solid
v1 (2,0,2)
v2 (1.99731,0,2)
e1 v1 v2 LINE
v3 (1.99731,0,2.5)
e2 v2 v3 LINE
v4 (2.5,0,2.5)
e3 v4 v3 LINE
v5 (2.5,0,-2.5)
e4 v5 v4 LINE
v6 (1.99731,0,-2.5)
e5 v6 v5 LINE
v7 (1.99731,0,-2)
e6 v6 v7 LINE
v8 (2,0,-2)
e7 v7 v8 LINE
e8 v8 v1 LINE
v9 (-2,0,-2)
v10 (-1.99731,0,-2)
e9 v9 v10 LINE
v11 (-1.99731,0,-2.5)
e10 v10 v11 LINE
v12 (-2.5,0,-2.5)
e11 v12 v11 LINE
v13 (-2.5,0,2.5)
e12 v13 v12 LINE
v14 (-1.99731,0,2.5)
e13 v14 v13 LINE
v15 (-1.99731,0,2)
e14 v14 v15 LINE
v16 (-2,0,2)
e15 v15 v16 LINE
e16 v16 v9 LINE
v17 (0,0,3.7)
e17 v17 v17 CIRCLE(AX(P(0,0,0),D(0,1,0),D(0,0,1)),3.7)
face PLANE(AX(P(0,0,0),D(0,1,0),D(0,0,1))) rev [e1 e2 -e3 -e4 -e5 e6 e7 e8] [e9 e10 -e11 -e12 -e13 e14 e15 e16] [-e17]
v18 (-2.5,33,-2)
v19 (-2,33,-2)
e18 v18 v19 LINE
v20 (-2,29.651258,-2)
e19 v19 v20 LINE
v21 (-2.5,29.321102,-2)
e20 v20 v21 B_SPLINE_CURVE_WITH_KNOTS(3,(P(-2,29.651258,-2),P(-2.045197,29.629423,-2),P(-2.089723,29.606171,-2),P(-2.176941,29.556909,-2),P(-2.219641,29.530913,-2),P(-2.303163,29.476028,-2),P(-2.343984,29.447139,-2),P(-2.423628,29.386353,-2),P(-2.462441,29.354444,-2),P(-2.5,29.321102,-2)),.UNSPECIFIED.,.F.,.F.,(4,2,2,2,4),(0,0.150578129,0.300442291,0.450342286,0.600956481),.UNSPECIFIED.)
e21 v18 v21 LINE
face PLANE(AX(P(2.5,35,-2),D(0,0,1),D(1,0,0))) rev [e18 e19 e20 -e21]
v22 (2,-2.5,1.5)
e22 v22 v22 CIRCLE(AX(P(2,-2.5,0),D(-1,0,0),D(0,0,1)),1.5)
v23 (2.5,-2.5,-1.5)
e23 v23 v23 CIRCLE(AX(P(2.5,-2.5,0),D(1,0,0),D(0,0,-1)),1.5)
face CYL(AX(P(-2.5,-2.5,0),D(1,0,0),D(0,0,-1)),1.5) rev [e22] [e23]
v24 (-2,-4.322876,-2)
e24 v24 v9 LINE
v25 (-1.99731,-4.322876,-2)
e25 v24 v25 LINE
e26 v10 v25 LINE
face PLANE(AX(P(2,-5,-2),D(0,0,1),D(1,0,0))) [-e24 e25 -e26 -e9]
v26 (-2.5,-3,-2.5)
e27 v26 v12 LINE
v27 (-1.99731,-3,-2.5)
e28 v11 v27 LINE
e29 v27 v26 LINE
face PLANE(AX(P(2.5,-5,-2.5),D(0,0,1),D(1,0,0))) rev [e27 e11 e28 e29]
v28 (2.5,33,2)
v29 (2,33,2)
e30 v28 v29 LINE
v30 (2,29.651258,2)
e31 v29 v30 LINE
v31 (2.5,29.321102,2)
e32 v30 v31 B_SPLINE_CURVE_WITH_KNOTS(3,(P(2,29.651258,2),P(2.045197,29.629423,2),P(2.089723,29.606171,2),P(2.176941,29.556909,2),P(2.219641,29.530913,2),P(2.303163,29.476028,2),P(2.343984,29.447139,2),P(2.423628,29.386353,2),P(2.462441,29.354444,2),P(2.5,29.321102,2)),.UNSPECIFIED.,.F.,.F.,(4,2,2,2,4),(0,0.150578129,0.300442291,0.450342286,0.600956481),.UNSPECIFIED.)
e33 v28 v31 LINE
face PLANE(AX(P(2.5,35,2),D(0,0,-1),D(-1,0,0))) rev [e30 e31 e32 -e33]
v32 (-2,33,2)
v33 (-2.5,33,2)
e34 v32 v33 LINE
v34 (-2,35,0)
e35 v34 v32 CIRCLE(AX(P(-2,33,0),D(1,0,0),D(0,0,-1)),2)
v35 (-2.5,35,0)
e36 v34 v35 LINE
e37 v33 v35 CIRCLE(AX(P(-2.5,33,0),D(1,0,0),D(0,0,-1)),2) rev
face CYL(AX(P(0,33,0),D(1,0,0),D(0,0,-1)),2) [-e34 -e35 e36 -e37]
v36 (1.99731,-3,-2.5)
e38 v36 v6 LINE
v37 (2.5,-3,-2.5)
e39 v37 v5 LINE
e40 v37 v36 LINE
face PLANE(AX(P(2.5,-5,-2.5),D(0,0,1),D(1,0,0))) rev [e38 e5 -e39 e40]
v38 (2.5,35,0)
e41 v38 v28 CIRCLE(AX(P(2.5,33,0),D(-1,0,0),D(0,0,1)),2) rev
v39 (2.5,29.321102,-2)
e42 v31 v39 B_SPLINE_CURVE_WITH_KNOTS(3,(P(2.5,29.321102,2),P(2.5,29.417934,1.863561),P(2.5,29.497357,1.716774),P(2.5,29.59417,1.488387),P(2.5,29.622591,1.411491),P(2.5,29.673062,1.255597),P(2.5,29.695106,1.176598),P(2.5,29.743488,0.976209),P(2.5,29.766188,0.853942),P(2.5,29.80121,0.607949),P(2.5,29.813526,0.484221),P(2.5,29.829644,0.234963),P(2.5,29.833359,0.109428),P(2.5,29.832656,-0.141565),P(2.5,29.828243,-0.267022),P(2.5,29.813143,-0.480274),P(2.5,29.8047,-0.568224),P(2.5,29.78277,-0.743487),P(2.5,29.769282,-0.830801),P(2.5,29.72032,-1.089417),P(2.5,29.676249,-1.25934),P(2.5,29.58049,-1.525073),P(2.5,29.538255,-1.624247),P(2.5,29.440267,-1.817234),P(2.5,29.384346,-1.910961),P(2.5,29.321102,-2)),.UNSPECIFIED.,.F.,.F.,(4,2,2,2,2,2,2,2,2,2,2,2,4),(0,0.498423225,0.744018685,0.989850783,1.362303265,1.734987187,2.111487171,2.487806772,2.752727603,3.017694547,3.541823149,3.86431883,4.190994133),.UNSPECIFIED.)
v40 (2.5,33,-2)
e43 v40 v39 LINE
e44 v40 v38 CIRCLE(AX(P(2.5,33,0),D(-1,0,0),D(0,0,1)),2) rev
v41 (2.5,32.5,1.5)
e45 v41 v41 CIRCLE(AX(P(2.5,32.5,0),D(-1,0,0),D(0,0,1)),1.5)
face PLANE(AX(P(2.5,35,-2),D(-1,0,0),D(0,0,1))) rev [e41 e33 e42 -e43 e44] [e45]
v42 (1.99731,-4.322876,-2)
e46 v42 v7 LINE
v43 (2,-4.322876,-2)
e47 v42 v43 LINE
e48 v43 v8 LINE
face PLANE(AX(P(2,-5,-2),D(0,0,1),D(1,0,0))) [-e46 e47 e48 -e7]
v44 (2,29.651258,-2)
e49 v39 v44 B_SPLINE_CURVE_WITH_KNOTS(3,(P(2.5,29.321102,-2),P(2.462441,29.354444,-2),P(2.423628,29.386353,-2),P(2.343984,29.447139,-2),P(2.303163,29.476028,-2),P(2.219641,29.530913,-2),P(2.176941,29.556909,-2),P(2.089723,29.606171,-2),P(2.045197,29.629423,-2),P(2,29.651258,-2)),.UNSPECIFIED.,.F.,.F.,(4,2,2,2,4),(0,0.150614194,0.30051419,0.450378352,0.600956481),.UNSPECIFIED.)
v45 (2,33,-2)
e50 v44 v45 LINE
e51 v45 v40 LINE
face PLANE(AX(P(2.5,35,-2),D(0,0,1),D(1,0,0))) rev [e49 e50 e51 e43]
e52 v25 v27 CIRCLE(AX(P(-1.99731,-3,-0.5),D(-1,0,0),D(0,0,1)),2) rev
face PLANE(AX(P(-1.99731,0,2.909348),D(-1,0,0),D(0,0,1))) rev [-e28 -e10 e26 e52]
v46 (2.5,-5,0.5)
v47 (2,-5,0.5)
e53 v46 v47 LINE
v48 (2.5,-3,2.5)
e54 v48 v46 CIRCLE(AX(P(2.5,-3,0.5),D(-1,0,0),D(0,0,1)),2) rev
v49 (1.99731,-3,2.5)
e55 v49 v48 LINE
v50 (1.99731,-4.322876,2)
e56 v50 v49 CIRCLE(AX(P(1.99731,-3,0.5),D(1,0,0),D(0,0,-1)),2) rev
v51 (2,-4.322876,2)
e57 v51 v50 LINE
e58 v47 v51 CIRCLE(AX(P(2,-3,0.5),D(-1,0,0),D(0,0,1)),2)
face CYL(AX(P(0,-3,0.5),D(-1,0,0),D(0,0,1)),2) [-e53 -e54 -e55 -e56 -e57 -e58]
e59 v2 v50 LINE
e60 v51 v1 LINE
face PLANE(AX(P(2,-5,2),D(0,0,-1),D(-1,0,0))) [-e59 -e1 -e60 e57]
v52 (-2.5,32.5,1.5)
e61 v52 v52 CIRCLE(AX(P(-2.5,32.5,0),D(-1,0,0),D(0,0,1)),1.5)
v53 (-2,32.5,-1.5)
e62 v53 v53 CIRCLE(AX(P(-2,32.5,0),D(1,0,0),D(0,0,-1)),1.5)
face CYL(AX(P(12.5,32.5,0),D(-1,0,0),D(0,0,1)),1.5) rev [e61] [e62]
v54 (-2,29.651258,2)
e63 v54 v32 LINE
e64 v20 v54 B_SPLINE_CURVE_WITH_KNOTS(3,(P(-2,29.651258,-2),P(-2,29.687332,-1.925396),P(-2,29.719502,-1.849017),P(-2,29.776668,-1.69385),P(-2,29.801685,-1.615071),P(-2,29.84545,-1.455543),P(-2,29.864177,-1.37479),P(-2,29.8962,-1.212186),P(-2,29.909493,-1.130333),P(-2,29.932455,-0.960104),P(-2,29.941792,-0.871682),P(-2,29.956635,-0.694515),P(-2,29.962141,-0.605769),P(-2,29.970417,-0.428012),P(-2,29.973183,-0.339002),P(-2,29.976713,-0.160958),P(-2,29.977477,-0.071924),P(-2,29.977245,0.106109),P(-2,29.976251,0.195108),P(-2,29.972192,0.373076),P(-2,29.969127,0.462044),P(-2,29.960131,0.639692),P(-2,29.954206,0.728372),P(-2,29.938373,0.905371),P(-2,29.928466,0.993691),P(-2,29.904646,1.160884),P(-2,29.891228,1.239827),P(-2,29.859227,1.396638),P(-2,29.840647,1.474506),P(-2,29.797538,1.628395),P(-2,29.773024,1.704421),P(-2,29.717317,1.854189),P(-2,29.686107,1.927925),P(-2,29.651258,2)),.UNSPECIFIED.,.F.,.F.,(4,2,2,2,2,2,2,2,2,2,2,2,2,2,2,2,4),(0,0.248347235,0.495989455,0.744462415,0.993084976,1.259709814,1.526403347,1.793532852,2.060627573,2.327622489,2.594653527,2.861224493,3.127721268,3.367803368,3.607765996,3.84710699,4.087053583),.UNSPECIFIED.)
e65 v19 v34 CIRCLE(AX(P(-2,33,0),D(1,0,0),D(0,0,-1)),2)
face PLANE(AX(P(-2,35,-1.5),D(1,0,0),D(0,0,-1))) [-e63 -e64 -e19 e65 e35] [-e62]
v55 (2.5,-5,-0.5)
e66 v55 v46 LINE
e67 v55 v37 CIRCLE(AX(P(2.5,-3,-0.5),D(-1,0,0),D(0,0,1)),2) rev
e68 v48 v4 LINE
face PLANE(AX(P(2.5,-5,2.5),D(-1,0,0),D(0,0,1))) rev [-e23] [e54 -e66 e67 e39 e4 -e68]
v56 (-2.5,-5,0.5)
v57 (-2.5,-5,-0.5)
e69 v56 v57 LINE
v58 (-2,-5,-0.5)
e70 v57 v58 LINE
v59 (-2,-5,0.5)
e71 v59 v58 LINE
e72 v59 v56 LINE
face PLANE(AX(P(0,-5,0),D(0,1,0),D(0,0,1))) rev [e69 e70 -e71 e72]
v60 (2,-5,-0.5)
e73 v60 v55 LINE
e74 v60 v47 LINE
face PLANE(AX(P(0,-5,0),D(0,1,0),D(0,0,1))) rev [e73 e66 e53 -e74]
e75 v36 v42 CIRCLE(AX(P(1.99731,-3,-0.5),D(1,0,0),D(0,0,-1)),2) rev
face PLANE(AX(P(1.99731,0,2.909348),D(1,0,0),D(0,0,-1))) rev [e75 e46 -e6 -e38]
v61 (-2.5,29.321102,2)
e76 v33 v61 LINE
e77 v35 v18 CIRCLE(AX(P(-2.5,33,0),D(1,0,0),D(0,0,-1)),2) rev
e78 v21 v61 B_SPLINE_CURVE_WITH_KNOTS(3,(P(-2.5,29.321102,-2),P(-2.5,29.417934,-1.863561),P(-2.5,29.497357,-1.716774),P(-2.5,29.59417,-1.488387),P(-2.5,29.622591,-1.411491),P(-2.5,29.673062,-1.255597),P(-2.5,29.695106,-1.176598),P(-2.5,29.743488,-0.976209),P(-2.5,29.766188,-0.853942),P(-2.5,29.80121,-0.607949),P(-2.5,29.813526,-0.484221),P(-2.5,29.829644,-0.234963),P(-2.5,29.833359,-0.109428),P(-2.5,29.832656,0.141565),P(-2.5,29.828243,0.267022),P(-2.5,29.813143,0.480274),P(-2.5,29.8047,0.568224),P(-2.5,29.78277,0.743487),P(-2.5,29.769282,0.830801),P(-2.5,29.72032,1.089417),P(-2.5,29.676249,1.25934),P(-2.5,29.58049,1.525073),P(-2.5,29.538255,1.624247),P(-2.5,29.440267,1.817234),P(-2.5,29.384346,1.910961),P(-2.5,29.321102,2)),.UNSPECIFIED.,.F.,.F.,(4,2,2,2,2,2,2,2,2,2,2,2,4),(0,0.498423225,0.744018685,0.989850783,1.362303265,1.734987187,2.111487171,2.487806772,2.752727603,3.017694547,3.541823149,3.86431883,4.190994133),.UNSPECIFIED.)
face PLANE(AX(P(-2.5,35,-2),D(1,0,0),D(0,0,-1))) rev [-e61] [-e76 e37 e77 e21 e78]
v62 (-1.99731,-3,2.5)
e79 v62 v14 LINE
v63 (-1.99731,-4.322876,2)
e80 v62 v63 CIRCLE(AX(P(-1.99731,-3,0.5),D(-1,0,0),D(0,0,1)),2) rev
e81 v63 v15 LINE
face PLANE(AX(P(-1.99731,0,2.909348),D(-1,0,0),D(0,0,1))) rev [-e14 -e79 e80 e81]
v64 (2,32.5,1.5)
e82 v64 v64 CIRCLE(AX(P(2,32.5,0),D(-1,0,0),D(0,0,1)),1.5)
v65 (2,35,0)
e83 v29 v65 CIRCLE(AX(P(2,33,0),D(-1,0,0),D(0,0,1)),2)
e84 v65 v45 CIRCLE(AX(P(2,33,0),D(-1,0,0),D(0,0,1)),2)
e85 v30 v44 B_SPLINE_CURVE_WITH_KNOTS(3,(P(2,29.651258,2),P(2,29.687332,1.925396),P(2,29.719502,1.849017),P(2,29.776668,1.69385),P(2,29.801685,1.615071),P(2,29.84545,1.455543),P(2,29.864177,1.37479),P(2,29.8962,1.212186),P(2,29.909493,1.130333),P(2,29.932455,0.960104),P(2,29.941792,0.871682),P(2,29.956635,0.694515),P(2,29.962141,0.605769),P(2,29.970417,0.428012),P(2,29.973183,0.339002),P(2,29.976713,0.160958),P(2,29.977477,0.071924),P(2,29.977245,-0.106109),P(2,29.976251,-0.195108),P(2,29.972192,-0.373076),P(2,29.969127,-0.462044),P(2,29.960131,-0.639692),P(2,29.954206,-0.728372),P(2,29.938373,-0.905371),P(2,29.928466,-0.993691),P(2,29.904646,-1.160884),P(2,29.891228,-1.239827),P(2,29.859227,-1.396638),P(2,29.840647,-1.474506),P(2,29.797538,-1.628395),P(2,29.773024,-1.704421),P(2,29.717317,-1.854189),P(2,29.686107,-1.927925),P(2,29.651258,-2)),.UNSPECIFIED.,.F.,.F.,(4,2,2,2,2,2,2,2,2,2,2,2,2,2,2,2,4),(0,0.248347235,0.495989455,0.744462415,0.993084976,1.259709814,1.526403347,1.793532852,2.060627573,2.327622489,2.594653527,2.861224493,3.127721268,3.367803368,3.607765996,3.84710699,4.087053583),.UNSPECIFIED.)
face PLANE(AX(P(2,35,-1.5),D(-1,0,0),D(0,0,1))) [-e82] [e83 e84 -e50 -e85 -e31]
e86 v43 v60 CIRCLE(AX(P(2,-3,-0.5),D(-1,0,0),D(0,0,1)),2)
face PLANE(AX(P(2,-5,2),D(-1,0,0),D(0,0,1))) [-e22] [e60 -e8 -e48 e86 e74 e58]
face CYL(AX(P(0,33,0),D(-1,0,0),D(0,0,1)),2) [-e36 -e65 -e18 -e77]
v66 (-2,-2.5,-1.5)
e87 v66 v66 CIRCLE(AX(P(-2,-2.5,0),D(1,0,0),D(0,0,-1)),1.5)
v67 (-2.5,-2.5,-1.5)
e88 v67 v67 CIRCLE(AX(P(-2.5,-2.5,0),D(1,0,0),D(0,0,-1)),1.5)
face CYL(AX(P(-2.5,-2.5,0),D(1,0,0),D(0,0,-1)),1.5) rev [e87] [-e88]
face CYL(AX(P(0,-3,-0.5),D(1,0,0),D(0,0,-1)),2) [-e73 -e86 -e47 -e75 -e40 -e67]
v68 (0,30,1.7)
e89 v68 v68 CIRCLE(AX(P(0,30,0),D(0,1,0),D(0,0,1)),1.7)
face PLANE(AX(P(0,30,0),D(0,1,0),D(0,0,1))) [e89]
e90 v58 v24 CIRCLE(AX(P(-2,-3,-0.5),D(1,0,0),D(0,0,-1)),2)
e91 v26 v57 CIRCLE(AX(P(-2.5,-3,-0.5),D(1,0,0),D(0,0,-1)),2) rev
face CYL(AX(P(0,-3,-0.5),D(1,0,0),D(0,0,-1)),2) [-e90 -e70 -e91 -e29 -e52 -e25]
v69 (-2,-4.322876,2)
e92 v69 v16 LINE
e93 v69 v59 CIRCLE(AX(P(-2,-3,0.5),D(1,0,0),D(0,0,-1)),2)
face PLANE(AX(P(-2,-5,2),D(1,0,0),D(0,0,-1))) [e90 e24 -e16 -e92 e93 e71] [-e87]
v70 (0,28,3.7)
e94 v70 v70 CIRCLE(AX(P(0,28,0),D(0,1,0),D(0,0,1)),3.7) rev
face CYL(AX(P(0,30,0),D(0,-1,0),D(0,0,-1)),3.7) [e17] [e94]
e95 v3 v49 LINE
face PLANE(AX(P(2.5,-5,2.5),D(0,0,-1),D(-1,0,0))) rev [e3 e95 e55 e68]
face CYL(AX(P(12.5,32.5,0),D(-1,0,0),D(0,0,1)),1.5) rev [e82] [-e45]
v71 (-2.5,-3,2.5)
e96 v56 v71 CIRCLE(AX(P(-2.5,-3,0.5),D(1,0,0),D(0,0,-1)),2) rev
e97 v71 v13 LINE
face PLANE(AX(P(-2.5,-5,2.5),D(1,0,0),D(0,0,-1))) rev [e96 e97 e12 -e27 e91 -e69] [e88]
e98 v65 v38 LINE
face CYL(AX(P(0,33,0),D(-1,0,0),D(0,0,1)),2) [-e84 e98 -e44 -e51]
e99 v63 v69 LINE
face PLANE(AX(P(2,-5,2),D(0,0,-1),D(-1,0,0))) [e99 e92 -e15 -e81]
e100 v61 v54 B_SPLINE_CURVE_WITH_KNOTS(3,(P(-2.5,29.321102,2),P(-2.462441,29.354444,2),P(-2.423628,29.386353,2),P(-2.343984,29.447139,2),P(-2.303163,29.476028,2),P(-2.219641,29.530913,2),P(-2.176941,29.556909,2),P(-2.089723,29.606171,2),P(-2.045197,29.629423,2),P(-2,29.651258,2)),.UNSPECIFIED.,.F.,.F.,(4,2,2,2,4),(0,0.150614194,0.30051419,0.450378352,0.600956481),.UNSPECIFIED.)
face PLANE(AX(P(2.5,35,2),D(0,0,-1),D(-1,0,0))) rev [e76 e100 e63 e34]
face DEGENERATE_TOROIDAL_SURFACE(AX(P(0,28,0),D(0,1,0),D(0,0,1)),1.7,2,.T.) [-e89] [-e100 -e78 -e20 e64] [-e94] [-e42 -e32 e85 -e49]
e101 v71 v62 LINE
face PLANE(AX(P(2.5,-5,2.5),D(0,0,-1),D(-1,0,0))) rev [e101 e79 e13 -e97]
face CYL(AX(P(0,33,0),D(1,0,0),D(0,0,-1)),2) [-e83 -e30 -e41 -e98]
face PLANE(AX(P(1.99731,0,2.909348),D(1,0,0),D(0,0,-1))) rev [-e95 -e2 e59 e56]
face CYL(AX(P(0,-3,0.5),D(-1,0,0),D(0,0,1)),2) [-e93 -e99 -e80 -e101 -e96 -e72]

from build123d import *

# Parameters (mm, degrees)
SKETCH1_R           = 3.7
BOSS_EXTRUDE1_DEPTH = 30
SKETCH2_W           = 5
SKETCH2_H           = 4
SKETCH2_W_2         = 4
SKETCH2_H_2         = 3
BOSS_EXTRUDE2_DEPTH = 5
SKETCH3_W           = 4
SKETCH3_H           = 4.53219821
CUT_EXTRUDE1_DEPTH  = 5
SKETCH4_R           = 1.5
CUT_EXTRUDE2_DEPTH  = 15
FILLET1_R           = 2
FILLET2_R           = 2
SKETCH5_W           = 5
SKETCH5_H           = 5
SKETCH5_W_2         = 4
SKETCH5_H_2         = 4
BOSS_EXTRUDE3_DEPTH = 5
SKETCH6_W           = 3.994620944
SKETCH6_H           = 5.818695304
CUT_EXTRUDE3_DEPTH  = 5
SKETCH7_R           = 1.5
CUT_EXTRUDE4_DEPTH  = 5
FILLET3_R           = 2


# Some blends are built 0.0001 mm under size
with BuildPart() as part:
    # Sketch1 → Boss-Extrude1 (new body)
    with BuildSketch(Plane(origin=(0, 0, 0), x_dir=(1, 0, 0), z_dir=(0, 1, 0))):
        with Locations(Location((0, 0, 0), (0, 0, 270))):
            Circle(SKETCH1_R)
    extrude(amount=BOSS_EXTRUDE1_DEPTH)

    # Sketch2 → Boss-Extrude2 (add)
    with BuildSketch(Plane(origin=(0, 30, 0), x_dir=(1, 0, 0), z_dir=(0, 1, 0))):
        Rectangle(SKETCH2_W, SKETCH2_H)
        Rectangle(SKETCH2_W_2, SKETCH2_H_2, mode=Mode.SUBTRACT)
    extrude(amount=BOSS_EXTRUDE2_DEPTH)

    # Sketch3 → Cut-Extrude1 (cut)
    with BuildSketch(Plane(origin=(0, 35, 0), x_dir=(1, 0, 0), z_dir=(0, 1, 0))):
        Rectangle(SKETCH3_W, SKETCH3_H)
    extrude(amount=-CUT_EXTRUDE1_DEPTH, mode=Mode.SUBTRACT)

    # Sketch4 → Cut-Extrude2 (cut)
    with BuildSketch(Plane.ZY.offset(2.5)):
        with Locations((0, 32.5)):
            Circle(SKETCH4_R)
    extrude(amount=-CUT_EXTRUDE2_DEPTH, mode=Mode.SUBTRACT)

    # Fillet1
    fillet1_edges = [part.edges().sort_by_distance(p)[0] for p in [
        (-2.25, 35, 2),
        (-2.25, 35, -2),
        (2.25, 35, -2),
        (2.25, 35, 2),
    ]]
    fillet(fillet1_edges, radius=FILLET1_R - 0.0001)  # a hair under: the kernel refuses the full size

    # Fillet2
    # the kernel refuses this fillet: 2 mm, written as the material it takes off along each edge
    with BuildSketch(Plane(origin=(0, 30, 0), x_dir=(0, 0, 1), z_dir=(-1, 0, 0))) as fillet2_piece_1_section:
        with BuildLine():
            CenterArc((3.7 - FILLET2_R, -FILLET2_R), FILLET2_R, 0, 90)
            Line((3.7, -FILLET2_R), (3.7, 0))
            Line((3.7, 0), (3.7 - FILLET2_R, 0))
        make_face()
    fillet2_piece_1 = revolve(axis=Axis((0, 30, 0), (0, 1, 0)), mode=Mode.PRIVATE)
    fillet2_piece_1 = split(fillet2_piece_1, bisect_by=Plane(origin=(2, 29.996904363, 0.950092039), z_dir=(-1, 0, 0)), keep=Keep.TOP, mode=Mode.PRIVATE)
    fillet2_piece_1 = split(fillet2_piece_1, bisect_by=Plane(origin=(-2, 29.996904363, 0.950092039), z_dir=(1, 0, 0)), keep=Keep.TOP, mode=Mode.PRIVATE)
    add(fillet2_piece_1, mode=Mode.SUBTRACT)
    with BuildSketch(Plane(origin=(0, 30, 0), x_dir=(0, 0, 1), z_dir=(-1, 0, 0))) as fillet2_piece_2_section:
        with BuildLine():
            CenterArc((3.7 - FILLET2_R, -FILLET2_R), FILLET2_R, 0, 90)
            Line((3.7, -FILLET2_R), (3.7, 0))
            Line((3.7, 0), (3.7 - FILLET2_R, 0))
        make_face()
    fillet2_piece_2 = revolve(axis=Axis((0, 30, 0), (0, 1, 0)), mode=Mode.PRIVATE)
    fillet2_piece_2 = split(fillet2_piece_2, bisect_by=Plane(origin=(2.24397726, 29.466228533, 2), z_dir=(0, 0, 1)), keep=Keep.TOP, mode=Mode.PRIVATE)
    add(fillet2_piece_2, mode=Mode.SUBTRACT)
    with BuildSketch(Plane(origin=(0, 30, 0), x_dir=(0, 0, 1), z_dir=(-1, 0, 0))) as fillet2_piece_3_section:
        with BuildLine():
            CenterArc((3.7 - FILLET2_R, -FILLET2_R), FILLET2_R, 0, 90)
            Line((3.7, -FILLET2_R), (3.7, 0))
            Line((3.7, 0), (3.7 - FILLET2_R, 0))
        make_face()
    fillet2_piece_3 = revolve(axis=Axis((0, 30, 0), (0, 1, 0)), mode=Mode.PRIVATE)
    fillet2_piece_3 = split(fillet2_piece_3, bisect_by=Plane(origin=(2.5, 29.502863649, 1.19e-07), z_dir=(1, 0, 0)), keep=Keep.TOP, mode=Mode.PRIVATE)
    add(fillet2_piece_3, mode=Mode.SUBTRACT)
    with BuildSketch(Plane(origin=(0, 30, 0), x_dir=(0, 0, 1), z_dir=(-1, 0, 0))) as fillet2_piece_4_section:
        with BuildLine():
            CenterArc((3.7 - FILLET2_R, -FILLET2_R), FILLET2_R, 0, 90)
            Line((3.7, -FILLET2_R), (3.7, 0))
            Line((3.7, 0), (3.7 - FILLET2_R, 0))
        make_face()
    fillet2_piece_4 = revolve(axis=Axis((0, 30, 0), (0, 1, 0)), mode=Mode.PRIVATE)
    fillet2_piece_4 = split(fillet2_piece_4, bisect_by=Plane(origin=(2.243977257, 29.466228303, -2), z_dir=(0, 0, -1)), keep=Keep.TOP, mode=Mode.PRIVATE)
    add(fillet2_piece_4, mode=Mode.SUBTRACT)
    with BuildSketch(Plane(origin=(0, 30, 0), x_dir=(0, 0, 1), z_dir=(-1, 0, 0))) as fillet2_piece_5_section:
        with BuildLine():
            CenterArc((3.7 - FILLET2_R, -FILLET2_R), FILLET2_R, 0, 90)
            Line((3.7, -FILLET2_R), (3.7, 0))
            Line((3.7, 0), (3.7 - FILLET2_R, 0))
        make_face()
    fillet2_piece_5 = revolve(axis=Axis((0, 30, 0), (0, 1, 0)), mode=Mode.PRIVATE)
    fillet2_piece_5 = split(fillet2_piece_5, bisect_by=Plane(origin=(-2.5, 29.50286365, -1.18e-07), z_dir=(-1, 0, 0)), keep=Keep.TOP, mode=Mode.PRIVATE)
    add(fillet2_piece_5, mode=Mode.SUBTRACT)

    # Sketch5 → Boss-Extrude3 (add)
    with BuildSketch(Plane.XZ):
        Rectangle(SKETCH5_W, SKETCH5_H)
        Rectangle(SKETCH5_W_2, SKETCH5_H_2, mode=Mode.SUBTRACT)
    extrude(amount=BOSS_EXTRUDE3_DEPTH)

    # Sketch6 → Cut-Extrude3 (cut)
    with BuildSketch(Plane.XZ.offset(5)):
        Rectangle(SKETCH6_W, SKETCH6_H)
    extrude(amount=-CUT_EXTRUDE3_DEPTH, mode=Mode.SUBTRACT)

    # Sketch7 → Cut-Extrude4 (cut)
    with BuildSketch(Plane(origin=(2.5, 0, 0), x_dir=(0, 0, -1), z_dir=(1, 0, 0))):
        with Locations((0, -2.5)):
            Circle(SKETCH7_R)
    extrude(amount=-CUT_EXTRUDE4_DEPTH, mode=Mode.SUBTRACT)

    # Fillet3
    fillet3_edges = [part.edges().sort_by_distance(p)[0] for p in [
        (-2.248655236, -5, -2.5),
        (-2.248655236, -5, 2.5),
        (2.248655236, -5, 2.5),
        (2.248655236, -5, -2.5),
    ]]
    fillet(fillet3_edges, radius=FILLET3_R)


solid = part.part
